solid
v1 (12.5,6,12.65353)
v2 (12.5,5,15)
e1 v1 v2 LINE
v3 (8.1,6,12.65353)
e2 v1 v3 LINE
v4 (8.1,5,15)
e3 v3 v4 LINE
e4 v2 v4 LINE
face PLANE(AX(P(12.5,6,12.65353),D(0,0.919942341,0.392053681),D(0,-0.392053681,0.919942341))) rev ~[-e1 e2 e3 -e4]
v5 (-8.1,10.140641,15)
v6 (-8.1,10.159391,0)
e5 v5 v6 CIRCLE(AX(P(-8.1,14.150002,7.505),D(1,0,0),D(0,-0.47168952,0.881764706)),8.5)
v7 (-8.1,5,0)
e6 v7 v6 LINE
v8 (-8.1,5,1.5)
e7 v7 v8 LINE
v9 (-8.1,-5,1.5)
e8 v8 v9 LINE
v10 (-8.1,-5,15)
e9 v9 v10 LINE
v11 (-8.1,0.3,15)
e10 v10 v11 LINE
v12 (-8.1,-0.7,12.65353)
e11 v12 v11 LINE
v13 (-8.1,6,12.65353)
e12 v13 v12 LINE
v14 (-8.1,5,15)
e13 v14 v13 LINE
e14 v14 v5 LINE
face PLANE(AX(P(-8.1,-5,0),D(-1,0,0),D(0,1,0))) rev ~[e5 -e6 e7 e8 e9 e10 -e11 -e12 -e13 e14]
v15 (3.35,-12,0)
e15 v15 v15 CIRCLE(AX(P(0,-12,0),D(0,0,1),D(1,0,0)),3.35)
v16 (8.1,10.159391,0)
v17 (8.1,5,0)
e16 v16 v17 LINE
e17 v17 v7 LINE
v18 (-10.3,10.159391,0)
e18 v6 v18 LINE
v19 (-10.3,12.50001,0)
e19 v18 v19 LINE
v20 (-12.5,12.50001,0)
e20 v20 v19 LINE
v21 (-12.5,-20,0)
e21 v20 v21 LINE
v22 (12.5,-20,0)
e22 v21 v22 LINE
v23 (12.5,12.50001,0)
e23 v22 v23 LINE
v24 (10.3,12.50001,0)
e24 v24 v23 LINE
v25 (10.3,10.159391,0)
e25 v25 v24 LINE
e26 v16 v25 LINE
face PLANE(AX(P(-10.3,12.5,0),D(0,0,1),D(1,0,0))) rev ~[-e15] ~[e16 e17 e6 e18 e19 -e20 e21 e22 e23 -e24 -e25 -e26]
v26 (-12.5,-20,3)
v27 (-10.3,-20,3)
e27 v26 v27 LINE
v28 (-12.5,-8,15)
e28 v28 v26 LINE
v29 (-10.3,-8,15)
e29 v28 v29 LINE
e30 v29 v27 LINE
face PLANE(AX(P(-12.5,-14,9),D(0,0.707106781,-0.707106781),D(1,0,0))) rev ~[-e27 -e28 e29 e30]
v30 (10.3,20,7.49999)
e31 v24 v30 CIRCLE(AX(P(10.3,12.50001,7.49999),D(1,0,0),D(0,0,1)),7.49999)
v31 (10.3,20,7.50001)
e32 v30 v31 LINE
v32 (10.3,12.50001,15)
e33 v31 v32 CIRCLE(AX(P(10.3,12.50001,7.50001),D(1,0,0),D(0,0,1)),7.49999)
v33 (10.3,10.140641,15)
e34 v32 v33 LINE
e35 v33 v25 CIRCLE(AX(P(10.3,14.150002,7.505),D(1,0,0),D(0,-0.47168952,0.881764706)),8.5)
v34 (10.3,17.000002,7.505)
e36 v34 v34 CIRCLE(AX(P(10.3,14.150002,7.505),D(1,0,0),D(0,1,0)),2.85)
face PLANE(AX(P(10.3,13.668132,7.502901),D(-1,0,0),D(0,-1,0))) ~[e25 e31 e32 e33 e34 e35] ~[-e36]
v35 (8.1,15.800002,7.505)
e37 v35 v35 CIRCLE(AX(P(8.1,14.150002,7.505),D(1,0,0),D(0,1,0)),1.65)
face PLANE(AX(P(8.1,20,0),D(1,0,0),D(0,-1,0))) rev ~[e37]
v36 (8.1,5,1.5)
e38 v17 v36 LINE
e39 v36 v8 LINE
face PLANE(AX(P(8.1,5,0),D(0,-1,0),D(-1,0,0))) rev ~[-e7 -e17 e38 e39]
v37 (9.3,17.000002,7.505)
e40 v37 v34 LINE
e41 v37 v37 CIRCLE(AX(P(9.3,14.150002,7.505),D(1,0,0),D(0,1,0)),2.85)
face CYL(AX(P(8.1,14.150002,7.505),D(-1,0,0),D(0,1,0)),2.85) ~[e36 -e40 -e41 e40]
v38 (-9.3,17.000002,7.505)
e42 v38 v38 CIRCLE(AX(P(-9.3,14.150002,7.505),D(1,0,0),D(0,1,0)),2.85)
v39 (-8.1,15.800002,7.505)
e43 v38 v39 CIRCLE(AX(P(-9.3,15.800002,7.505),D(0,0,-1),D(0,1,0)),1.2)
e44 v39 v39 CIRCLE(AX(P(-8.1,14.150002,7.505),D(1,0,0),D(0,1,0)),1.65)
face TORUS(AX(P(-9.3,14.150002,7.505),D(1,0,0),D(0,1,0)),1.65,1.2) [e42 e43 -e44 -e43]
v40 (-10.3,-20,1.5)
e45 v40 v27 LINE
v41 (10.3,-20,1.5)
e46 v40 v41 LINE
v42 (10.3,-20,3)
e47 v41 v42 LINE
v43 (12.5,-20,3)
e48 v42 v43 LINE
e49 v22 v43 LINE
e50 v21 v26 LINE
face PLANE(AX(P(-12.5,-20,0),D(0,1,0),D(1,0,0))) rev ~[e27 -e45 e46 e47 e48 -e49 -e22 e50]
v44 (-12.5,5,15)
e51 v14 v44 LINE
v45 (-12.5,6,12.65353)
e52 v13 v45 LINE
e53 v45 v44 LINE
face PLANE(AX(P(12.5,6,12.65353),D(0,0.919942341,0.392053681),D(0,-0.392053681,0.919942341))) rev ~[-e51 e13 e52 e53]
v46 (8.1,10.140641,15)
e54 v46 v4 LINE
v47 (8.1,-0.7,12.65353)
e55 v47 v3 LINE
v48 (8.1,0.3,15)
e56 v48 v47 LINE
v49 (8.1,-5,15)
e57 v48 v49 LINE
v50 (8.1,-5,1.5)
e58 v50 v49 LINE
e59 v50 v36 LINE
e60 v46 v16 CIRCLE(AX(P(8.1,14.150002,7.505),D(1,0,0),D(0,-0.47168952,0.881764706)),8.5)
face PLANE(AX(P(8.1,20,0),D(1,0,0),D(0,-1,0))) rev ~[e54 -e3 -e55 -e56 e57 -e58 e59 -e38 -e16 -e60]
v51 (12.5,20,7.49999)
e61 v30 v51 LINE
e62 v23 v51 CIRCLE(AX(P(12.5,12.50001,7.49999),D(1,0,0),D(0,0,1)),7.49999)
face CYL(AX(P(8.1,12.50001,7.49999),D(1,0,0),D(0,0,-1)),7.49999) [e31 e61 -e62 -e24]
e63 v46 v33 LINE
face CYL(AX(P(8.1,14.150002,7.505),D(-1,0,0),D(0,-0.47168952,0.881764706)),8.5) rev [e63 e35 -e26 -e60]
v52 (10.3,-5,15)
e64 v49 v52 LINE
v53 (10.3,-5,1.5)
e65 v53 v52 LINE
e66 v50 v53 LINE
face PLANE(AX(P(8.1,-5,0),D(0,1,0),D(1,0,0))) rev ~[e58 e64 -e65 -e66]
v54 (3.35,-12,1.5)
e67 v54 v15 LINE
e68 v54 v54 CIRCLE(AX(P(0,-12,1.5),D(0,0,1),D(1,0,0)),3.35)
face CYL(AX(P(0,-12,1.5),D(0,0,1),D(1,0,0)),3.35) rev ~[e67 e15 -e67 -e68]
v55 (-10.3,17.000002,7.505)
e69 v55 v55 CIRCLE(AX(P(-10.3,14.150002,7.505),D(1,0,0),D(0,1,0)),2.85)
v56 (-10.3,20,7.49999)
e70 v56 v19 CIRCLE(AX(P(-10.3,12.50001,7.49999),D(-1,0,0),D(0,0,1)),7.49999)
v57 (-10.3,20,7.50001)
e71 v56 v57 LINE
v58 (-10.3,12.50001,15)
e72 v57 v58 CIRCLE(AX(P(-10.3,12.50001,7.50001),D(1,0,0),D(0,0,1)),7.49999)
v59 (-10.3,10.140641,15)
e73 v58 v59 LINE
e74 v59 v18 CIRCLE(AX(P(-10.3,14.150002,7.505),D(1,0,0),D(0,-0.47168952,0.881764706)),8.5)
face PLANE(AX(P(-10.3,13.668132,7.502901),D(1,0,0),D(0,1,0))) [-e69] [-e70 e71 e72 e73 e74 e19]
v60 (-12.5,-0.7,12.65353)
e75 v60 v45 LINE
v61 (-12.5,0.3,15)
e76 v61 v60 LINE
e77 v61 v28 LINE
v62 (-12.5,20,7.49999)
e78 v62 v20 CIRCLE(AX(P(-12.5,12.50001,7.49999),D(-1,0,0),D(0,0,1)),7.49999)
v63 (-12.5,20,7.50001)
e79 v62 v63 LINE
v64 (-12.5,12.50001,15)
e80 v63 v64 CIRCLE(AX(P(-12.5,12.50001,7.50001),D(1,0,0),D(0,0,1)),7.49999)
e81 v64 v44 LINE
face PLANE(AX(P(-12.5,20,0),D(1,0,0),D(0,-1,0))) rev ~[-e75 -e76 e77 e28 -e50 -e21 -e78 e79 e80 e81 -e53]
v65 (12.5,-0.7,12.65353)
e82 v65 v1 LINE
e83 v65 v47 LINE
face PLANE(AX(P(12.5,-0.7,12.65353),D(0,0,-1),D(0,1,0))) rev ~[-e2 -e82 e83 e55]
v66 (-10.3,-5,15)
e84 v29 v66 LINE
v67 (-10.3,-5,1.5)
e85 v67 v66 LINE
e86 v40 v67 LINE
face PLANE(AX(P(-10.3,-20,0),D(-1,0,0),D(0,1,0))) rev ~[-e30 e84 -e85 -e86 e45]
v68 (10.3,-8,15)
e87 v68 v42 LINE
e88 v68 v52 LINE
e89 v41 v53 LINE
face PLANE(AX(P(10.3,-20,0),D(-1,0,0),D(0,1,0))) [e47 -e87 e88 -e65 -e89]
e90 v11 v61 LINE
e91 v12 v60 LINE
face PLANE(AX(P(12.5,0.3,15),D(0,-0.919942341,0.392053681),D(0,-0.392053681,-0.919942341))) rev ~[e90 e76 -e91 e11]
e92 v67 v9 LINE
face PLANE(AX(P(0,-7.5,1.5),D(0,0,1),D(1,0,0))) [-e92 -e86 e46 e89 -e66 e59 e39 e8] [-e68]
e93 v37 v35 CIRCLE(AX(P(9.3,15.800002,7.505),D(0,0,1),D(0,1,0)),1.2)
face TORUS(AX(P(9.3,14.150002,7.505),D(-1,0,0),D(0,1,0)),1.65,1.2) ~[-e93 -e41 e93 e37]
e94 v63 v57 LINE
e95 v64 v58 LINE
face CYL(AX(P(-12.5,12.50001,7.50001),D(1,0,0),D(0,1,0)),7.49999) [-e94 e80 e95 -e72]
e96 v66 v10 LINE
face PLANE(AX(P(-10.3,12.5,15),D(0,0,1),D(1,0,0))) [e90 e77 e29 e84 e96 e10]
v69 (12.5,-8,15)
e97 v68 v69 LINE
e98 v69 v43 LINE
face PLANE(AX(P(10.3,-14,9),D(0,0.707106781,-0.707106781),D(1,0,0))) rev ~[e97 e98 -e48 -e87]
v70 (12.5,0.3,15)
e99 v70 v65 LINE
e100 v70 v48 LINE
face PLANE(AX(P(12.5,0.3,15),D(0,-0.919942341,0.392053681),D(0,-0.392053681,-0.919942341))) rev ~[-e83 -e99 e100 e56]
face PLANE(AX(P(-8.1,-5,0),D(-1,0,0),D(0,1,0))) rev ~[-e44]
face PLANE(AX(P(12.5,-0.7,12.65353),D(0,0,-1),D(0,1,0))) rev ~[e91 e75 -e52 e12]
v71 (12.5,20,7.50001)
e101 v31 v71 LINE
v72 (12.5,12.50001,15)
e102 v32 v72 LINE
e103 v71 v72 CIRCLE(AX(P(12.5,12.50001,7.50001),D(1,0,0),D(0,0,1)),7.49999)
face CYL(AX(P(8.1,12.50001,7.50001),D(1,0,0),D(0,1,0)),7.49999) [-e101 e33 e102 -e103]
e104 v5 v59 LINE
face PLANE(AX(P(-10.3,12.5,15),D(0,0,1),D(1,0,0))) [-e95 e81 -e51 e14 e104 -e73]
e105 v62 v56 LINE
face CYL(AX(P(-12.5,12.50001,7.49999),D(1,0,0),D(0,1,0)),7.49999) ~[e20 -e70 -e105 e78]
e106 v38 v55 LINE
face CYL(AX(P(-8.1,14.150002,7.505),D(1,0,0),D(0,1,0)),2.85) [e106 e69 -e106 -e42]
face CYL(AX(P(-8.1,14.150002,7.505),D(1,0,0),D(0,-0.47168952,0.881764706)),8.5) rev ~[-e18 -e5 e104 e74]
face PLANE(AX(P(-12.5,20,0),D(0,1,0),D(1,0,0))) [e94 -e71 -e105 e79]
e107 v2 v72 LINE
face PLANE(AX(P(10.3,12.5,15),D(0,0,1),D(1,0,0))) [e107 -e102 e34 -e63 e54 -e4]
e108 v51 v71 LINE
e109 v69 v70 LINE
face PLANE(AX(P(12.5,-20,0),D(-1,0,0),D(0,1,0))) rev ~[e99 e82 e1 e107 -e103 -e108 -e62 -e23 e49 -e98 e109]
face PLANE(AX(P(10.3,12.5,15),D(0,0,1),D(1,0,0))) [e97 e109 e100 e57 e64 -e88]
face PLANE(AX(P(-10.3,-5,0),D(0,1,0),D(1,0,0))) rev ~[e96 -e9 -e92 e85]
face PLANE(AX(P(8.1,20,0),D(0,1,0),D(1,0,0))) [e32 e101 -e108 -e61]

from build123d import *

# Parameters (mm, degrees)
F0_W      = 2.2
F0_H      = 15
F1_DEPTH  = 1.5
F0_W_2    = 4.4
F0_H_2    = 4.6
F2_DEPTH  = 15
F3_SIZE   = 12
F5_DEPTH  = 25
F6_R      = 2.85
F7_DEPTH  = 2.2
F8_R      = 1.2
F9_R      = 7.49999
F10_R     = 3.35
F11_DEPTH = 25


# Not quite as in the source:
# - a fillet or chamfer is up to 0.001 mm smaller than in the source, because OpenCascade refuses the exact size
# - a pattern or mirror of a feature is missing from the dataset's text; its kind, count and spacing are read off the source's solid


with BuildPart() as f1:
    # F0 (on Top) → F1 (new body)
    with BuildSketch(Plane.XY):
        Polygon((8.1, 0.4), (8.1, 5), (-8.1, 5), (-8.1, 0.4), (-8.1, -5), (-8.1, -20), (8.1, -20), (8.1, -5), align=None)
        with Locations((-9.2, -12.5)):
            Rectangle(F0_W, F0_H)
        with Locations((9.2, -12.5)):
            Rectangle(F0_W, F0_H)
    extrude(amount=F1_DEPTH)

    # F0 (on Top) → F2 (join)
    with BuildSketch(Plane.XY):
        with Locations((-10.3, 12.5)):
            Rectangle(F0_W_2, F0_H)
        with Locations((10.3, 12.5)):
            Rectangle(F0_W_2, F0_H)
        with Locations((-10.3, 2.7)):
            Rectangle(F0_W_2, F0_H_2)
        with Locations((10.3, 2.7)):
            Rectangle(F0_W_2, F0_H_2)
        with Locations((-11.4, -12.5)):
            Rectangle(F0_W, F0_H)
        Polygon((-8.1, -5), (-8.1, 0.4), (-12.5, 0.4), (-12.5, -5), (-10.3, -5), align=None)
        Polygon((12.5, -5), (12.5, 0.4), (8.1, 0.4), (8.1, -5), (10.3, -5), align=None)
        with Locations((11.4, -12.5)):
            Rectangle(F0_W, F0_H)
    extrude(amount=F2_DEPTH)

    # F3
    f3_edges = [f1.edges().sort_by_distance(p)[0] for p in [
        (11.4, -20, 15),
        (-11.4, -20, 15),
    ]]
    chamfer(f3_edges, length=F3_SIZE)

    # F4 (on face) → F5 (cut)
    with BuildSketch(Plane.YZ.offset(12.5)):
        Polygon((6, 12.653529644), (5, 15), (0.3, 15), (-0.7, 12.653529644), align=None)
    extrude(amount=-F5_DEPTH, mode=Mode.SUBTRACT)

    # F6 (on face) → F7 (cut)
    with BuildSketch(Plane.YZ.offset(-8.1)):
        with BuildLine():
            Line((20, 1.3383538289), (20, 13.6716461711))
            ThreePointArc((20, 13.6716461711), (19.1242226672, 14.3975416295), (18.1593630584, 15))
            Line((18.1593630584, 15), (10.1406412151, 15))
            ThreePointArc((10.1406412151, 15), (5.6500087774, 7.4943749708), (10.1593912813, 0))
            Line((10.1593912813, 0), (18.1406129922, 0))
            ThreePointArc((18.1406129922, 0), (19.1156030804, 0.6062459626), (20, 1.3383538289))
        make_face()
        with Locations((14.1500021368, 7.505)):
            Circle(F6_R, mode=Mode.SUBTRACT)
    f7 = extrude(amount=-F7_DEPTH, mode=Mode.SUBTRACT)

    # F7_copies: F7 across plane
    add(f7.mirror(Plane(origin=(0, 0, 0), x_dir=(0, 0, 1), z_dir=(1, 0, 0))), mode=Mode.SUBTRACT)

    # F8
    f8_edges = [f1.edges().sort_by_distance(p)[0] for p in [
        (-8.1, 11.300002, 7.505),
        (8.1, 11.300002, 7.505),
    ]]
    fillet(f8_edges, radius=F8_R)

    # F9 (radius 7.5 in the source; OpenCascade refuses exactly that, so slightly less here)
    f9_edges = [f1.edges().sort_by_distance(p)[0] for p in [
        (-10.3, 20, 15),
        (-10.3, 20, 0),
        (10.3, 20, 15),
        (10.3, 20, 0),
    ]]
    fillet(f9_edges, radius=F9_R)

    # F10 (on face) → F11 (cut)
    with BuildSketch(Plane.XY.offset(1.5)):
        with Locations((0, -12)):
            Circle(F10_R)
    extrude(amount=-F11_DEPTH, mode=Mode.SUBTRACT)


solid = f1.part
